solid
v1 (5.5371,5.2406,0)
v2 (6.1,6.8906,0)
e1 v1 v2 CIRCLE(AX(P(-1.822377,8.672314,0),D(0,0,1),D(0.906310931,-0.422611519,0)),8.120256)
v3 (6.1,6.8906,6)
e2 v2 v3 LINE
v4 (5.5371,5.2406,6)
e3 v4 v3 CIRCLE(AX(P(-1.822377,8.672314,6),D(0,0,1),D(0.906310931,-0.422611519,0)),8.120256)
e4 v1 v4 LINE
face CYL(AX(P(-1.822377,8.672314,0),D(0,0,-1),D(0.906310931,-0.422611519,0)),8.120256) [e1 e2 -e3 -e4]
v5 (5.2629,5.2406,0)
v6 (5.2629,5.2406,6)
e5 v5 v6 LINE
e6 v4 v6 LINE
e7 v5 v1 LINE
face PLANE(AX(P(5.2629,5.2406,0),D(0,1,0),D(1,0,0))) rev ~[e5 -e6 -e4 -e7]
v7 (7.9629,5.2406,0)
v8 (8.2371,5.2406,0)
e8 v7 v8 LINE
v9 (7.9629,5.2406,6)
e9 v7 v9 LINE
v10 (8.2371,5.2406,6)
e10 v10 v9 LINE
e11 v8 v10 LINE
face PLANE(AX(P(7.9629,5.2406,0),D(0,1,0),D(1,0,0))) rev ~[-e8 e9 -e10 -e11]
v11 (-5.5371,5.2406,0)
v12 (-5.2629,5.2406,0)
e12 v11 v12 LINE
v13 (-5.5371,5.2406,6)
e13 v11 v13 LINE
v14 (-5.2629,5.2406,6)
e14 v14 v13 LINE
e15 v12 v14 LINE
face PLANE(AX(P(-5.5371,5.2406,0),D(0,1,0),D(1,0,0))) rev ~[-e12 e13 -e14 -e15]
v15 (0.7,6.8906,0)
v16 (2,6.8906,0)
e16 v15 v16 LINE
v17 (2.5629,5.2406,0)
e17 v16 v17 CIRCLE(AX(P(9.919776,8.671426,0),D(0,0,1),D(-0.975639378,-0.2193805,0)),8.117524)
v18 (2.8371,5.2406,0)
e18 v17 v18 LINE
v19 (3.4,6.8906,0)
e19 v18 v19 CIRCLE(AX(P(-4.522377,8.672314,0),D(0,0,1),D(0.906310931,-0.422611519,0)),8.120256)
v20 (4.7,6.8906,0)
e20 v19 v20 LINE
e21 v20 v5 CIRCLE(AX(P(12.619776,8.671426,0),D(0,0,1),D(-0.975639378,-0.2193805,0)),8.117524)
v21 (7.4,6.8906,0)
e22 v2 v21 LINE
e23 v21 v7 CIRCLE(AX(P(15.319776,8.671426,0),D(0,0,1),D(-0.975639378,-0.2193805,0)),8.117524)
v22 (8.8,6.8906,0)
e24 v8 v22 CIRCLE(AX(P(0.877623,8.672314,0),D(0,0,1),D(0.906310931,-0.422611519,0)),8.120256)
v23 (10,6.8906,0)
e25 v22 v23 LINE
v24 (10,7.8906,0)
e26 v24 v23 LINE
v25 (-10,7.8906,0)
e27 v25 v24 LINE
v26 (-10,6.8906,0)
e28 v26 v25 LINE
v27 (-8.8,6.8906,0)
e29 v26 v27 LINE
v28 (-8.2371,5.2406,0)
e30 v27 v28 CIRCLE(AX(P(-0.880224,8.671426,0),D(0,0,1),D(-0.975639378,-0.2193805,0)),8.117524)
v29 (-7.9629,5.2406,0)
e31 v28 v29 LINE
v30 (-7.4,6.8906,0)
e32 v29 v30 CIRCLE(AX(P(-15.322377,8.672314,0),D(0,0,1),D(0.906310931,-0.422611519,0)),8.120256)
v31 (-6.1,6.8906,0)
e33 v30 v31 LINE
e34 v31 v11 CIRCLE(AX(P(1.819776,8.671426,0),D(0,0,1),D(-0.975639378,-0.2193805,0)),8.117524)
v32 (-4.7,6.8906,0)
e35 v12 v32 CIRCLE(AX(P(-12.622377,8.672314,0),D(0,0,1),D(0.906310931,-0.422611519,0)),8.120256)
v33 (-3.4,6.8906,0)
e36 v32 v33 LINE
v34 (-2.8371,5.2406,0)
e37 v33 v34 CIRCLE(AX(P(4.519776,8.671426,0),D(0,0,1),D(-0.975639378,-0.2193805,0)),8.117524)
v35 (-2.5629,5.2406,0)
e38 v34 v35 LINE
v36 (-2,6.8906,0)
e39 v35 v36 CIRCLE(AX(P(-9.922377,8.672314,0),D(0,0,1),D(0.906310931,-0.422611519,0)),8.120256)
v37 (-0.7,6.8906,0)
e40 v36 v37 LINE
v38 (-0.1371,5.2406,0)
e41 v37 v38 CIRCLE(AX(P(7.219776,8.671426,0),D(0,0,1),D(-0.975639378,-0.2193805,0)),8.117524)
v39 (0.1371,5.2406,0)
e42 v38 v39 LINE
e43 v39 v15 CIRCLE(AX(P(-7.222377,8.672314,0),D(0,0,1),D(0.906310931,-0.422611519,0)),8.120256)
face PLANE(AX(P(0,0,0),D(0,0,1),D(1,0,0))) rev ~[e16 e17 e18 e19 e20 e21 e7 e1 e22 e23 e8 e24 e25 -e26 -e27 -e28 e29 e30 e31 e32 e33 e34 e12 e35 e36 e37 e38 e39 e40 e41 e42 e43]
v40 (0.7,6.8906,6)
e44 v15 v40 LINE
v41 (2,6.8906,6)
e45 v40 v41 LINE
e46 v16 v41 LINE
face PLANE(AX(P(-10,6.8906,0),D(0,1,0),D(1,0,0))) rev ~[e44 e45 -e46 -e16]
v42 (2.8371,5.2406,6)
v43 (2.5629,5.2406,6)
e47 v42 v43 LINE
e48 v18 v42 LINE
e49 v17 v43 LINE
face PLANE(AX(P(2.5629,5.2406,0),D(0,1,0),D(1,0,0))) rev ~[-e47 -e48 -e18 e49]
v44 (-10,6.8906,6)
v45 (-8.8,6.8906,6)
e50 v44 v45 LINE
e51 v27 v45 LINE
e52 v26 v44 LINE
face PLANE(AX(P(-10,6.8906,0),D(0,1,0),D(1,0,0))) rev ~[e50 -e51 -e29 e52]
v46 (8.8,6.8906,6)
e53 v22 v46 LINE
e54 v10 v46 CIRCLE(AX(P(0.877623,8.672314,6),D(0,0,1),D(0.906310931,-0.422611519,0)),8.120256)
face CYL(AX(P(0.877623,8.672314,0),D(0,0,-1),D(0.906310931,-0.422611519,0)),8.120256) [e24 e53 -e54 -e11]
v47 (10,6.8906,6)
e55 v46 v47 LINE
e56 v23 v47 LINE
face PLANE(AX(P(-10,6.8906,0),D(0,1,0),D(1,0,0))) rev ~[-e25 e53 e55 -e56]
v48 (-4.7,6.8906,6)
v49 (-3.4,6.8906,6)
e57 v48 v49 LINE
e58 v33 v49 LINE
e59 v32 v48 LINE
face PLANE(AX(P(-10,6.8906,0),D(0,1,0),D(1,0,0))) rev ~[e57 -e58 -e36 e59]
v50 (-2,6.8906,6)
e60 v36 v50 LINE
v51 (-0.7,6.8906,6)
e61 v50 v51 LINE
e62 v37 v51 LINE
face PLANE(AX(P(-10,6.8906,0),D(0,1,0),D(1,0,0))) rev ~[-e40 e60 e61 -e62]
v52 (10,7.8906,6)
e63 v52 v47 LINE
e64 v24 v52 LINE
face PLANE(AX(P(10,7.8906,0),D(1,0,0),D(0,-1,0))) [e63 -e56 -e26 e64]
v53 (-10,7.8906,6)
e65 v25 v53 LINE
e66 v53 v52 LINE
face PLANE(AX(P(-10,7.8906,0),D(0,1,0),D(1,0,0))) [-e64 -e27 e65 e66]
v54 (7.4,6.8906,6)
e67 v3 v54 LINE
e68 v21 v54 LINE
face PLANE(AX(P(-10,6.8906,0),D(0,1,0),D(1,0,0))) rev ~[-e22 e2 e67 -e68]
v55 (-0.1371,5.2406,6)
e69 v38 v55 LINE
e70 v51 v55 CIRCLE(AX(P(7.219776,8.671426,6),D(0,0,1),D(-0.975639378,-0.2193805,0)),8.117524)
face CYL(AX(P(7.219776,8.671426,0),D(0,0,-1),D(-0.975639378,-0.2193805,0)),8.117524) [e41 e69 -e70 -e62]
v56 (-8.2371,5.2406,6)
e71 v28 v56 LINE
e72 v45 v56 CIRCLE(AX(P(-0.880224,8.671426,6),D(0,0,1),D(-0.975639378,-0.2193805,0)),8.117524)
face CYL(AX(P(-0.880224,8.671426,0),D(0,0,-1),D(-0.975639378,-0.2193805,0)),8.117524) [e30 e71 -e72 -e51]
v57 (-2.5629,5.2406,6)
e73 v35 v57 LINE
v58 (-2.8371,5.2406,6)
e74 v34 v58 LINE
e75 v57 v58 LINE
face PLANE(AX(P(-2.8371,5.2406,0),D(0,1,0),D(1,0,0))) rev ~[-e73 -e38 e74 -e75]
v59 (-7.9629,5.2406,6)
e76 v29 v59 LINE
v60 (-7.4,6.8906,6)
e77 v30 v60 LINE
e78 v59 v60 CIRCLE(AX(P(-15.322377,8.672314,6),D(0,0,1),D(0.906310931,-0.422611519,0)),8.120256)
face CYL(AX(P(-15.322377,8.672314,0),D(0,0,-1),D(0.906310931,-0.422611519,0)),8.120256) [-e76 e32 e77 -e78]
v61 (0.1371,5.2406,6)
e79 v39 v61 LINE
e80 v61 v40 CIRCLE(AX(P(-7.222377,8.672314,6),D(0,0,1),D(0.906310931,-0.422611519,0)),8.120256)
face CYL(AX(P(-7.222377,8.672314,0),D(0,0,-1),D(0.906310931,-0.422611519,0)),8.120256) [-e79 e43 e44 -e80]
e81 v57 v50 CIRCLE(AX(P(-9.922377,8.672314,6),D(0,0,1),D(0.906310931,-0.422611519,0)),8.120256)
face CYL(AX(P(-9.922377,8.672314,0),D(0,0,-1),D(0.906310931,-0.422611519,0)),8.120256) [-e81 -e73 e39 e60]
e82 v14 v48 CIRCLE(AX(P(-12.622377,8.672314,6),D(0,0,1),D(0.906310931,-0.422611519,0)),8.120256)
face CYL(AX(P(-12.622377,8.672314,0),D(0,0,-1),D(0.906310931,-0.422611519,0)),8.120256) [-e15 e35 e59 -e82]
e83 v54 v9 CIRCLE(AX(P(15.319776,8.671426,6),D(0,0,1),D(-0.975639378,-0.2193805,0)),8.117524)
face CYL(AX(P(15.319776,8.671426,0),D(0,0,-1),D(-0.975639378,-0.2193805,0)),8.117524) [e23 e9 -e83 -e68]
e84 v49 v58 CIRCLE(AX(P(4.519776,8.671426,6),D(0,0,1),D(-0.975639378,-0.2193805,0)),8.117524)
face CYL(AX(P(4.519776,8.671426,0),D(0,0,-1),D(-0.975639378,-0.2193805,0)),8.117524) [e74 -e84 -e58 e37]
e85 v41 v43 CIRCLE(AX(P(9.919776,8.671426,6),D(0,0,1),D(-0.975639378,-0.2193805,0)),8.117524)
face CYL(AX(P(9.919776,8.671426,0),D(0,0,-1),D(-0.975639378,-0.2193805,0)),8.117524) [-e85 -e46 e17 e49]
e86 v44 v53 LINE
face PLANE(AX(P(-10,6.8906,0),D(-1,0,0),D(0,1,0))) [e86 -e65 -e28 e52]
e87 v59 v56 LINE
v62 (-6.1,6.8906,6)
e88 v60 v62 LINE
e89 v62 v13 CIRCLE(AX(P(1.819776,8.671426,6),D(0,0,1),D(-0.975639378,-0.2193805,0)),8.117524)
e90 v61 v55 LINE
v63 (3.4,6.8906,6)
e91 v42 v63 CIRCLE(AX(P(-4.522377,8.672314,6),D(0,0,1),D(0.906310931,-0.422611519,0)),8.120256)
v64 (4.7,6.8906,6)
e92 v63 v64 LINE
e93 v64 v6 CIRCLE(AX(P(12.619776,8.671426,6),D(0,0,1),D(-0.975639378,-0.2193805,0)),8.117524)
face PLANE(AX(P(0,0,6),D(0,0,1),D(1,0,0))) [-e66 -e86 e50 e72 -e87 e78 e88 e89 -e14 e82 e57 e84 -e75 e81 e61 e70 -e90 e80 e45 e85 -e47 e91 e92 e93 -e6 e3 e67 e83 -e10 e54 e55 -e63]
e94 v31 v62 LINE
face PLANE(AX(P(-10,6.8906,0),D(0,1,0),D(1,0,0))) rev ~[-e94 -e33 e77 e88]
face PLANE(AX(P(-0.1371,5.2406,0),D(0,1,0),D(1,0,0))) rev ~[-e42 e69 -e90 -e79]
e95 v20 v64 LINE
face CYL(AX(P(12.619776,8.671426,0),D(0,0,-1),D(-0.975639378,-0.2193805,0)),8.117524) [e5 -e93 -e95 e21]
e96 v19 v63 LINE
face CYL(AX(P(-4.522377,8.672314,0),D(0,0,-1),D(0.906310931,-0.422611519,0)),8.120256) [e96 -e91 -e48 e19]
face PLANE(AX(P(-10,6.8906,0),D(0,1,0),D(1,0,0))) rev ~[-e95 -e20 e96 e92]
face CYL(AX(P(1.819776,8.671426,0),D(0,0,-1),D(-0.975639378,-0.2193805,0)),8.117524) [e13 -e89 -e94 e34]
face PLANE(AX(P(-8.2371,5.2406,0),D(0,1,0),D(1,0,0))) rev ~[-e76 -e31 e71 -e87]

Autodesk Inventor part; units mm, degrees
ref_plane "YZ Plane" through (0, 0, 0) normal (1, 0, 0) x (0, 1, 0)
ref_plane "XZ Plane" through (0, 0, 0) normal (0, 1, 0) x (-1, 0, 0)
ref_plane "XY Plane" through (0, 0, 0) normal (0, 0, 1) x (1, 0, 0)
sketch "Sketch1" plane through (0, 0, 0) normal (0, 0, 1) x (1, 0, 0)
  line L0 (0, -9.4281) -> (0, 9.3187)
  arc A0 (6.7496, 0.073) -> (6.51, 0.4187) centre (6.3746, 0.0689) ccw projected
  arc A1 (-6.7496, 0.073) -> (6.7496, 0.073) centre (0, 0) ccw projected
  arc A2 (-6.51, 0.4187) -> (-6.7496, 0.073) centre (-6.3746, 0.0689) ccw projected
  arc A3 (-4.3687, 0.6769) -> (-6.51, 0.4187) centre (-4.9321, -3.658) ccw projected
  arc A4 (-4.3687, 0.6769) -> (-4.2435, 0.7684) centre (-4.3542, 0.7885) ccw projected
  arc A5 (-4.2145, 0.914) -> (-4.2435, 0.7684) centre (0, 0) ccw projected
  arc A6 (-4.2145, 0.914) -> (-4.2952, 1.0464) centre (-4.3245, 0.9378) ccw projected
  arc A7 (-6.1747, 2.1045) -> (-4.2952, 1.0464) centre (-3.1568, 5.267) ccw projected
  arc A8 (-6.2638, 2.5155) -> (-6.1747, 2.1045) centre (-5.9158, 2.3758) ccw projected
  arc A9 (-6.0212, 3.0507) -> (-6.2638, 2.5155) centre (0, 0) ccw projected
  arc A10 (-5.6535, 3.2548) -> (-6.0212, 3.0507) centre (-5.6867, 2.8813) ccw projected
  arc A11 (-3.6188, 2.5393) -> (-5.6535, 3.2548) centre (-6.0413, -1.0993) ccw projected
  arc A12 (-3.6188, 2.5393) -> (-3.466, 2.566) centre (-3.5564, 2.633) ccw projected
  arc A13 (-3.3757, 2.6838) -> (-3.466, 2.566) centre (0, 0) ccw projected
  arc A14 (-3.3757, 2.6838) -> (-3.3894, 2.8382) centre (-3.4637, 2.7538) ccw projected
  arc A15 (-4.6071, 4.6184) -> (-3.3894, 2.8382) centre (-0.5017, 6.12) ccw projected
  arc A16 (-4.5052, 5.0265) -> (-4.6071, 4.6184) centre (-4.2549, 4.7472) ccw projected
  arc A17 (-4.051, 5.3993) -> (-4.5052, 5.0265) centre (0, 0) ccw projected
  arc A18 (-3.6309, 5.4196) -> (-4.051, 5.3993) centre (-3.8259, 5.0993) ccw projected
  arc A19 (-2.1225, 3.878) -> (-3.6309, 5.4196) centre (-5.9045, 1.6861) ccw projected
  arc A20 (-2.1225, 3.878) -> (-1.9736, 3.8344) centre (-2.0251, 3.9344) ccw projected
  arc A21 (-1.8405, 3.9) -> (-1.9736, 3.8344) centre (0, 0) ccw projected
  arc A22 (-1.8405, 3.9) -> (-1.7845, 4.0446) centre (-1.8886, 4.0017) ccw projected
  arc A23 (-2.0893, 6.1798) -> (-1.7845, 4.0446) centre (2.2568, 5.7108) ccw projected
  arc A24 (-1.8174, 6.5007) -> (-2.0893, 6.1798) centre (-1.7165, 6.1396) ccw projected
  arc A25 (-1.2452, 6.6342) -> (-1.8174, 6.5007) centre (0, 0) ccw projected
  arc A26 (-0.8594, 6.4666) -> (-1.2452, 6.6342) centre (-1.176, 6.2656) ccw projected
  arc A27 (-0.1884, 4.4168) -> (-0.8594, 6.4666) centre (-4.5499, 4.1237) ccw projected
  arc A28 (-0.1884, 4.4168) -> (-0.0742, 4.3119) centre (-0.0761, 4.4243) ccw projected
  arc A29 (0.0742, 4.3119) -> (-0.0742, 4.3119) centre (0, 0) ccw projected
  arc A30 (0.0742, 4.3119) -> (0.1884, 4.4168) centre (0.0761, 4.4243) ccw projected
  arc A31 (0.8594, 6.4666) -> (0.1884, 4.4168) centre (4.5499, 4.1237) ccw projected
  arc A32 (1.2452, 6.6342) -> (0.8594, 6.4666) centre (1.176, 6.2656) ccw projected
  arc A33 (1.8174, 6.5007) -> (1.2452, 6.6342) centre (0, 0) ccw projected
  arc A34 (2.0893, 6.1798) -> (1.8174, 6.5007) centre (1.7165, 6.1396) ccw projected
  arc A35 (1.7845, 4.0446) -> (2.0893, 6.1798) centre (-2.2568, 5.7108) ccw projected
  arc A36 (1.7845, 4.0446) -> (1.8405, 3.9) centre (1.8886, 4.0017) ccw projected
  arc A37 (1.9736, 3.8344) -> (1.8405, 3.9) centre (0, 0) ccw projected
  arc A38 (1.9736, 3.8344) -> (2.1225, 3.878) centre (2.0251, 3.9344) ccw projected
  arc A39 (3.6309, 5.4196) -> (2.1225, 3.878) centre (5.9045, 1.6861) ccw projected
  arc A40 (4.051, 5.3993) -> (3.6309, 5.4196) centre (3.8259, 5.0993) ccw projected
  arc A41 (4.5052, 5.0265) -> (4.051, 5.3993) centre (0, 0) ccw projected
  arc A42 (4.6071, 4.6184) -> (4.5052, 5.0265) centre (4.2549, 4.7472) ccw projected
  arc A43 (3.3894, 2.8382) -> (4.6071, 4.6184) centre (0.5017, 6.12) ccw projected
  arc A44 (3.3894, 2.8382) -> (3.3757, 2.6838) centre (3.4637, 2.7538) ccw projected
  arc A45 (3.466, 2.566) -> (3.3757, 2.6838) centre (0, 0) ccw projected
  arc A46 (3.466, 2.566) -> (3.6188, 2.5393) centre (3.5564, 2.633) ccw projected
  arc A47 (5.6535, 3.2548) -> (3.6188, 2.5393) centre (6.0413, -1.0993) ccw projected
  arc A48 (6.0212, 3.0507) -> (5.6535, 3.2548) centre (5.6867, 2.8813) ccw projected
  arc A49 (6.2638, 2.5155) -> (6.0212, 3.0507) centre (0, 0) ccw projected
  arc A50 (6.1747, 2.1045) -> (6.2638, 2.5155) centre (5.9158, 2.3758) ccw projected
  arc A51 (4.2952, 1.0464) -> (6.1747, 2.1045) centre (3.1568, 5.267) ccw projected
  arc A52 (4.2952, 1.0464) -> (4.2145, 0.914) centre (4.3245, 0.9378) ccw projected
  arc A53 (4.2435, 0.7684) -> (4.2145, 0.914) centre (0, 0) ccw projected
  arc A54 (4.2435, 0.7684) -> (4.3687, 0.6769) centre (4.3542, 0.7885) ccw projected
  arc A55 (6.51, 0.4187) -> (4.3687, 0.6769) centre (4.9321, -3.658) ccw projected
  circle A56 centre (0, 0) radius 1.5 projected
  line L1 (-10, 6.8906) -> (10, 6.8906)
  line L2 (-10, 6.8906) -> (-10, 7.8906)
  line L3 (-10, 7.8906) -> (10, 7.8906)
  line L4 (10, 7.8906) -> (10, 6.8906)
  line L5 (-10, 6.6406) -> (10, 6.6406) construction
  line L6 (0, 4.7099) -> (-1.3614, 7.6295) construction
  line L7 (-0.5881, 5.9711) -> (0.5881, 5.9711) construction
  line L8 (-1.4832, 7.8906) -> (0, 4.7099) construction
  line L9 (0.5881, 5.9711) -> (-0.5881, 5.9711) construction
  arc A57 (-0.7, 6.8906) -> (-0.1371, 5.2406) centre (7.2211, 8.6718) ccw
  line L10 (-0.1371, 5.2406) -> (0.1371, 5.2406)
  arc A58 (0.1371, 5.2406) -> (0.7, 6.8906) centre (-7.2211, 8.6718) ccw
  line L11 (-1.3728, 7.8906) -> (0, 4.9465) construction
  point P0 (0, 6.8906)
  dimension "d0" = 20
  dimension "d1" = 0.25
  dimension "d2" = 1
  dimension "d3" = 0.1
  dimension "d4" = 1.4
  dimension "d5" = 1.65
extrude "Extrusion1" add sketch "Sketch1" along normal blind 6 contours L10 A57 L1 L0 | L0 L1 A58 L10
sketch "Sketch3" plane through (0, 0, 0) normal (0, 0, 1) x (1, 0, 0)
  line L0 (-10, 7.8906) -> (10, 7.8906) projected
  line L1 (-10, 6.8906) -> (-10, 7.8906) projected
  line L2 (-10, 6.8906) -> (10, 6.8906) projected
  line L3 (10, 7.8906) -> (10, 6.8906) projected
  point P0 (0, 0)
extrude "Extrusion2" add sketch "Sketch3" along normal up to surface (6 mm away)
pattern_linear "Rectangular Pattern1" count 7 spacing 2.7 along (1, 0, 0) of "Extrusion1" first direction both ways yes
equation "\"d12\" = 3.6 * model_gear_module"
equation "\"model_gear_module\" = 0.75"
properties part number "rack_test"
